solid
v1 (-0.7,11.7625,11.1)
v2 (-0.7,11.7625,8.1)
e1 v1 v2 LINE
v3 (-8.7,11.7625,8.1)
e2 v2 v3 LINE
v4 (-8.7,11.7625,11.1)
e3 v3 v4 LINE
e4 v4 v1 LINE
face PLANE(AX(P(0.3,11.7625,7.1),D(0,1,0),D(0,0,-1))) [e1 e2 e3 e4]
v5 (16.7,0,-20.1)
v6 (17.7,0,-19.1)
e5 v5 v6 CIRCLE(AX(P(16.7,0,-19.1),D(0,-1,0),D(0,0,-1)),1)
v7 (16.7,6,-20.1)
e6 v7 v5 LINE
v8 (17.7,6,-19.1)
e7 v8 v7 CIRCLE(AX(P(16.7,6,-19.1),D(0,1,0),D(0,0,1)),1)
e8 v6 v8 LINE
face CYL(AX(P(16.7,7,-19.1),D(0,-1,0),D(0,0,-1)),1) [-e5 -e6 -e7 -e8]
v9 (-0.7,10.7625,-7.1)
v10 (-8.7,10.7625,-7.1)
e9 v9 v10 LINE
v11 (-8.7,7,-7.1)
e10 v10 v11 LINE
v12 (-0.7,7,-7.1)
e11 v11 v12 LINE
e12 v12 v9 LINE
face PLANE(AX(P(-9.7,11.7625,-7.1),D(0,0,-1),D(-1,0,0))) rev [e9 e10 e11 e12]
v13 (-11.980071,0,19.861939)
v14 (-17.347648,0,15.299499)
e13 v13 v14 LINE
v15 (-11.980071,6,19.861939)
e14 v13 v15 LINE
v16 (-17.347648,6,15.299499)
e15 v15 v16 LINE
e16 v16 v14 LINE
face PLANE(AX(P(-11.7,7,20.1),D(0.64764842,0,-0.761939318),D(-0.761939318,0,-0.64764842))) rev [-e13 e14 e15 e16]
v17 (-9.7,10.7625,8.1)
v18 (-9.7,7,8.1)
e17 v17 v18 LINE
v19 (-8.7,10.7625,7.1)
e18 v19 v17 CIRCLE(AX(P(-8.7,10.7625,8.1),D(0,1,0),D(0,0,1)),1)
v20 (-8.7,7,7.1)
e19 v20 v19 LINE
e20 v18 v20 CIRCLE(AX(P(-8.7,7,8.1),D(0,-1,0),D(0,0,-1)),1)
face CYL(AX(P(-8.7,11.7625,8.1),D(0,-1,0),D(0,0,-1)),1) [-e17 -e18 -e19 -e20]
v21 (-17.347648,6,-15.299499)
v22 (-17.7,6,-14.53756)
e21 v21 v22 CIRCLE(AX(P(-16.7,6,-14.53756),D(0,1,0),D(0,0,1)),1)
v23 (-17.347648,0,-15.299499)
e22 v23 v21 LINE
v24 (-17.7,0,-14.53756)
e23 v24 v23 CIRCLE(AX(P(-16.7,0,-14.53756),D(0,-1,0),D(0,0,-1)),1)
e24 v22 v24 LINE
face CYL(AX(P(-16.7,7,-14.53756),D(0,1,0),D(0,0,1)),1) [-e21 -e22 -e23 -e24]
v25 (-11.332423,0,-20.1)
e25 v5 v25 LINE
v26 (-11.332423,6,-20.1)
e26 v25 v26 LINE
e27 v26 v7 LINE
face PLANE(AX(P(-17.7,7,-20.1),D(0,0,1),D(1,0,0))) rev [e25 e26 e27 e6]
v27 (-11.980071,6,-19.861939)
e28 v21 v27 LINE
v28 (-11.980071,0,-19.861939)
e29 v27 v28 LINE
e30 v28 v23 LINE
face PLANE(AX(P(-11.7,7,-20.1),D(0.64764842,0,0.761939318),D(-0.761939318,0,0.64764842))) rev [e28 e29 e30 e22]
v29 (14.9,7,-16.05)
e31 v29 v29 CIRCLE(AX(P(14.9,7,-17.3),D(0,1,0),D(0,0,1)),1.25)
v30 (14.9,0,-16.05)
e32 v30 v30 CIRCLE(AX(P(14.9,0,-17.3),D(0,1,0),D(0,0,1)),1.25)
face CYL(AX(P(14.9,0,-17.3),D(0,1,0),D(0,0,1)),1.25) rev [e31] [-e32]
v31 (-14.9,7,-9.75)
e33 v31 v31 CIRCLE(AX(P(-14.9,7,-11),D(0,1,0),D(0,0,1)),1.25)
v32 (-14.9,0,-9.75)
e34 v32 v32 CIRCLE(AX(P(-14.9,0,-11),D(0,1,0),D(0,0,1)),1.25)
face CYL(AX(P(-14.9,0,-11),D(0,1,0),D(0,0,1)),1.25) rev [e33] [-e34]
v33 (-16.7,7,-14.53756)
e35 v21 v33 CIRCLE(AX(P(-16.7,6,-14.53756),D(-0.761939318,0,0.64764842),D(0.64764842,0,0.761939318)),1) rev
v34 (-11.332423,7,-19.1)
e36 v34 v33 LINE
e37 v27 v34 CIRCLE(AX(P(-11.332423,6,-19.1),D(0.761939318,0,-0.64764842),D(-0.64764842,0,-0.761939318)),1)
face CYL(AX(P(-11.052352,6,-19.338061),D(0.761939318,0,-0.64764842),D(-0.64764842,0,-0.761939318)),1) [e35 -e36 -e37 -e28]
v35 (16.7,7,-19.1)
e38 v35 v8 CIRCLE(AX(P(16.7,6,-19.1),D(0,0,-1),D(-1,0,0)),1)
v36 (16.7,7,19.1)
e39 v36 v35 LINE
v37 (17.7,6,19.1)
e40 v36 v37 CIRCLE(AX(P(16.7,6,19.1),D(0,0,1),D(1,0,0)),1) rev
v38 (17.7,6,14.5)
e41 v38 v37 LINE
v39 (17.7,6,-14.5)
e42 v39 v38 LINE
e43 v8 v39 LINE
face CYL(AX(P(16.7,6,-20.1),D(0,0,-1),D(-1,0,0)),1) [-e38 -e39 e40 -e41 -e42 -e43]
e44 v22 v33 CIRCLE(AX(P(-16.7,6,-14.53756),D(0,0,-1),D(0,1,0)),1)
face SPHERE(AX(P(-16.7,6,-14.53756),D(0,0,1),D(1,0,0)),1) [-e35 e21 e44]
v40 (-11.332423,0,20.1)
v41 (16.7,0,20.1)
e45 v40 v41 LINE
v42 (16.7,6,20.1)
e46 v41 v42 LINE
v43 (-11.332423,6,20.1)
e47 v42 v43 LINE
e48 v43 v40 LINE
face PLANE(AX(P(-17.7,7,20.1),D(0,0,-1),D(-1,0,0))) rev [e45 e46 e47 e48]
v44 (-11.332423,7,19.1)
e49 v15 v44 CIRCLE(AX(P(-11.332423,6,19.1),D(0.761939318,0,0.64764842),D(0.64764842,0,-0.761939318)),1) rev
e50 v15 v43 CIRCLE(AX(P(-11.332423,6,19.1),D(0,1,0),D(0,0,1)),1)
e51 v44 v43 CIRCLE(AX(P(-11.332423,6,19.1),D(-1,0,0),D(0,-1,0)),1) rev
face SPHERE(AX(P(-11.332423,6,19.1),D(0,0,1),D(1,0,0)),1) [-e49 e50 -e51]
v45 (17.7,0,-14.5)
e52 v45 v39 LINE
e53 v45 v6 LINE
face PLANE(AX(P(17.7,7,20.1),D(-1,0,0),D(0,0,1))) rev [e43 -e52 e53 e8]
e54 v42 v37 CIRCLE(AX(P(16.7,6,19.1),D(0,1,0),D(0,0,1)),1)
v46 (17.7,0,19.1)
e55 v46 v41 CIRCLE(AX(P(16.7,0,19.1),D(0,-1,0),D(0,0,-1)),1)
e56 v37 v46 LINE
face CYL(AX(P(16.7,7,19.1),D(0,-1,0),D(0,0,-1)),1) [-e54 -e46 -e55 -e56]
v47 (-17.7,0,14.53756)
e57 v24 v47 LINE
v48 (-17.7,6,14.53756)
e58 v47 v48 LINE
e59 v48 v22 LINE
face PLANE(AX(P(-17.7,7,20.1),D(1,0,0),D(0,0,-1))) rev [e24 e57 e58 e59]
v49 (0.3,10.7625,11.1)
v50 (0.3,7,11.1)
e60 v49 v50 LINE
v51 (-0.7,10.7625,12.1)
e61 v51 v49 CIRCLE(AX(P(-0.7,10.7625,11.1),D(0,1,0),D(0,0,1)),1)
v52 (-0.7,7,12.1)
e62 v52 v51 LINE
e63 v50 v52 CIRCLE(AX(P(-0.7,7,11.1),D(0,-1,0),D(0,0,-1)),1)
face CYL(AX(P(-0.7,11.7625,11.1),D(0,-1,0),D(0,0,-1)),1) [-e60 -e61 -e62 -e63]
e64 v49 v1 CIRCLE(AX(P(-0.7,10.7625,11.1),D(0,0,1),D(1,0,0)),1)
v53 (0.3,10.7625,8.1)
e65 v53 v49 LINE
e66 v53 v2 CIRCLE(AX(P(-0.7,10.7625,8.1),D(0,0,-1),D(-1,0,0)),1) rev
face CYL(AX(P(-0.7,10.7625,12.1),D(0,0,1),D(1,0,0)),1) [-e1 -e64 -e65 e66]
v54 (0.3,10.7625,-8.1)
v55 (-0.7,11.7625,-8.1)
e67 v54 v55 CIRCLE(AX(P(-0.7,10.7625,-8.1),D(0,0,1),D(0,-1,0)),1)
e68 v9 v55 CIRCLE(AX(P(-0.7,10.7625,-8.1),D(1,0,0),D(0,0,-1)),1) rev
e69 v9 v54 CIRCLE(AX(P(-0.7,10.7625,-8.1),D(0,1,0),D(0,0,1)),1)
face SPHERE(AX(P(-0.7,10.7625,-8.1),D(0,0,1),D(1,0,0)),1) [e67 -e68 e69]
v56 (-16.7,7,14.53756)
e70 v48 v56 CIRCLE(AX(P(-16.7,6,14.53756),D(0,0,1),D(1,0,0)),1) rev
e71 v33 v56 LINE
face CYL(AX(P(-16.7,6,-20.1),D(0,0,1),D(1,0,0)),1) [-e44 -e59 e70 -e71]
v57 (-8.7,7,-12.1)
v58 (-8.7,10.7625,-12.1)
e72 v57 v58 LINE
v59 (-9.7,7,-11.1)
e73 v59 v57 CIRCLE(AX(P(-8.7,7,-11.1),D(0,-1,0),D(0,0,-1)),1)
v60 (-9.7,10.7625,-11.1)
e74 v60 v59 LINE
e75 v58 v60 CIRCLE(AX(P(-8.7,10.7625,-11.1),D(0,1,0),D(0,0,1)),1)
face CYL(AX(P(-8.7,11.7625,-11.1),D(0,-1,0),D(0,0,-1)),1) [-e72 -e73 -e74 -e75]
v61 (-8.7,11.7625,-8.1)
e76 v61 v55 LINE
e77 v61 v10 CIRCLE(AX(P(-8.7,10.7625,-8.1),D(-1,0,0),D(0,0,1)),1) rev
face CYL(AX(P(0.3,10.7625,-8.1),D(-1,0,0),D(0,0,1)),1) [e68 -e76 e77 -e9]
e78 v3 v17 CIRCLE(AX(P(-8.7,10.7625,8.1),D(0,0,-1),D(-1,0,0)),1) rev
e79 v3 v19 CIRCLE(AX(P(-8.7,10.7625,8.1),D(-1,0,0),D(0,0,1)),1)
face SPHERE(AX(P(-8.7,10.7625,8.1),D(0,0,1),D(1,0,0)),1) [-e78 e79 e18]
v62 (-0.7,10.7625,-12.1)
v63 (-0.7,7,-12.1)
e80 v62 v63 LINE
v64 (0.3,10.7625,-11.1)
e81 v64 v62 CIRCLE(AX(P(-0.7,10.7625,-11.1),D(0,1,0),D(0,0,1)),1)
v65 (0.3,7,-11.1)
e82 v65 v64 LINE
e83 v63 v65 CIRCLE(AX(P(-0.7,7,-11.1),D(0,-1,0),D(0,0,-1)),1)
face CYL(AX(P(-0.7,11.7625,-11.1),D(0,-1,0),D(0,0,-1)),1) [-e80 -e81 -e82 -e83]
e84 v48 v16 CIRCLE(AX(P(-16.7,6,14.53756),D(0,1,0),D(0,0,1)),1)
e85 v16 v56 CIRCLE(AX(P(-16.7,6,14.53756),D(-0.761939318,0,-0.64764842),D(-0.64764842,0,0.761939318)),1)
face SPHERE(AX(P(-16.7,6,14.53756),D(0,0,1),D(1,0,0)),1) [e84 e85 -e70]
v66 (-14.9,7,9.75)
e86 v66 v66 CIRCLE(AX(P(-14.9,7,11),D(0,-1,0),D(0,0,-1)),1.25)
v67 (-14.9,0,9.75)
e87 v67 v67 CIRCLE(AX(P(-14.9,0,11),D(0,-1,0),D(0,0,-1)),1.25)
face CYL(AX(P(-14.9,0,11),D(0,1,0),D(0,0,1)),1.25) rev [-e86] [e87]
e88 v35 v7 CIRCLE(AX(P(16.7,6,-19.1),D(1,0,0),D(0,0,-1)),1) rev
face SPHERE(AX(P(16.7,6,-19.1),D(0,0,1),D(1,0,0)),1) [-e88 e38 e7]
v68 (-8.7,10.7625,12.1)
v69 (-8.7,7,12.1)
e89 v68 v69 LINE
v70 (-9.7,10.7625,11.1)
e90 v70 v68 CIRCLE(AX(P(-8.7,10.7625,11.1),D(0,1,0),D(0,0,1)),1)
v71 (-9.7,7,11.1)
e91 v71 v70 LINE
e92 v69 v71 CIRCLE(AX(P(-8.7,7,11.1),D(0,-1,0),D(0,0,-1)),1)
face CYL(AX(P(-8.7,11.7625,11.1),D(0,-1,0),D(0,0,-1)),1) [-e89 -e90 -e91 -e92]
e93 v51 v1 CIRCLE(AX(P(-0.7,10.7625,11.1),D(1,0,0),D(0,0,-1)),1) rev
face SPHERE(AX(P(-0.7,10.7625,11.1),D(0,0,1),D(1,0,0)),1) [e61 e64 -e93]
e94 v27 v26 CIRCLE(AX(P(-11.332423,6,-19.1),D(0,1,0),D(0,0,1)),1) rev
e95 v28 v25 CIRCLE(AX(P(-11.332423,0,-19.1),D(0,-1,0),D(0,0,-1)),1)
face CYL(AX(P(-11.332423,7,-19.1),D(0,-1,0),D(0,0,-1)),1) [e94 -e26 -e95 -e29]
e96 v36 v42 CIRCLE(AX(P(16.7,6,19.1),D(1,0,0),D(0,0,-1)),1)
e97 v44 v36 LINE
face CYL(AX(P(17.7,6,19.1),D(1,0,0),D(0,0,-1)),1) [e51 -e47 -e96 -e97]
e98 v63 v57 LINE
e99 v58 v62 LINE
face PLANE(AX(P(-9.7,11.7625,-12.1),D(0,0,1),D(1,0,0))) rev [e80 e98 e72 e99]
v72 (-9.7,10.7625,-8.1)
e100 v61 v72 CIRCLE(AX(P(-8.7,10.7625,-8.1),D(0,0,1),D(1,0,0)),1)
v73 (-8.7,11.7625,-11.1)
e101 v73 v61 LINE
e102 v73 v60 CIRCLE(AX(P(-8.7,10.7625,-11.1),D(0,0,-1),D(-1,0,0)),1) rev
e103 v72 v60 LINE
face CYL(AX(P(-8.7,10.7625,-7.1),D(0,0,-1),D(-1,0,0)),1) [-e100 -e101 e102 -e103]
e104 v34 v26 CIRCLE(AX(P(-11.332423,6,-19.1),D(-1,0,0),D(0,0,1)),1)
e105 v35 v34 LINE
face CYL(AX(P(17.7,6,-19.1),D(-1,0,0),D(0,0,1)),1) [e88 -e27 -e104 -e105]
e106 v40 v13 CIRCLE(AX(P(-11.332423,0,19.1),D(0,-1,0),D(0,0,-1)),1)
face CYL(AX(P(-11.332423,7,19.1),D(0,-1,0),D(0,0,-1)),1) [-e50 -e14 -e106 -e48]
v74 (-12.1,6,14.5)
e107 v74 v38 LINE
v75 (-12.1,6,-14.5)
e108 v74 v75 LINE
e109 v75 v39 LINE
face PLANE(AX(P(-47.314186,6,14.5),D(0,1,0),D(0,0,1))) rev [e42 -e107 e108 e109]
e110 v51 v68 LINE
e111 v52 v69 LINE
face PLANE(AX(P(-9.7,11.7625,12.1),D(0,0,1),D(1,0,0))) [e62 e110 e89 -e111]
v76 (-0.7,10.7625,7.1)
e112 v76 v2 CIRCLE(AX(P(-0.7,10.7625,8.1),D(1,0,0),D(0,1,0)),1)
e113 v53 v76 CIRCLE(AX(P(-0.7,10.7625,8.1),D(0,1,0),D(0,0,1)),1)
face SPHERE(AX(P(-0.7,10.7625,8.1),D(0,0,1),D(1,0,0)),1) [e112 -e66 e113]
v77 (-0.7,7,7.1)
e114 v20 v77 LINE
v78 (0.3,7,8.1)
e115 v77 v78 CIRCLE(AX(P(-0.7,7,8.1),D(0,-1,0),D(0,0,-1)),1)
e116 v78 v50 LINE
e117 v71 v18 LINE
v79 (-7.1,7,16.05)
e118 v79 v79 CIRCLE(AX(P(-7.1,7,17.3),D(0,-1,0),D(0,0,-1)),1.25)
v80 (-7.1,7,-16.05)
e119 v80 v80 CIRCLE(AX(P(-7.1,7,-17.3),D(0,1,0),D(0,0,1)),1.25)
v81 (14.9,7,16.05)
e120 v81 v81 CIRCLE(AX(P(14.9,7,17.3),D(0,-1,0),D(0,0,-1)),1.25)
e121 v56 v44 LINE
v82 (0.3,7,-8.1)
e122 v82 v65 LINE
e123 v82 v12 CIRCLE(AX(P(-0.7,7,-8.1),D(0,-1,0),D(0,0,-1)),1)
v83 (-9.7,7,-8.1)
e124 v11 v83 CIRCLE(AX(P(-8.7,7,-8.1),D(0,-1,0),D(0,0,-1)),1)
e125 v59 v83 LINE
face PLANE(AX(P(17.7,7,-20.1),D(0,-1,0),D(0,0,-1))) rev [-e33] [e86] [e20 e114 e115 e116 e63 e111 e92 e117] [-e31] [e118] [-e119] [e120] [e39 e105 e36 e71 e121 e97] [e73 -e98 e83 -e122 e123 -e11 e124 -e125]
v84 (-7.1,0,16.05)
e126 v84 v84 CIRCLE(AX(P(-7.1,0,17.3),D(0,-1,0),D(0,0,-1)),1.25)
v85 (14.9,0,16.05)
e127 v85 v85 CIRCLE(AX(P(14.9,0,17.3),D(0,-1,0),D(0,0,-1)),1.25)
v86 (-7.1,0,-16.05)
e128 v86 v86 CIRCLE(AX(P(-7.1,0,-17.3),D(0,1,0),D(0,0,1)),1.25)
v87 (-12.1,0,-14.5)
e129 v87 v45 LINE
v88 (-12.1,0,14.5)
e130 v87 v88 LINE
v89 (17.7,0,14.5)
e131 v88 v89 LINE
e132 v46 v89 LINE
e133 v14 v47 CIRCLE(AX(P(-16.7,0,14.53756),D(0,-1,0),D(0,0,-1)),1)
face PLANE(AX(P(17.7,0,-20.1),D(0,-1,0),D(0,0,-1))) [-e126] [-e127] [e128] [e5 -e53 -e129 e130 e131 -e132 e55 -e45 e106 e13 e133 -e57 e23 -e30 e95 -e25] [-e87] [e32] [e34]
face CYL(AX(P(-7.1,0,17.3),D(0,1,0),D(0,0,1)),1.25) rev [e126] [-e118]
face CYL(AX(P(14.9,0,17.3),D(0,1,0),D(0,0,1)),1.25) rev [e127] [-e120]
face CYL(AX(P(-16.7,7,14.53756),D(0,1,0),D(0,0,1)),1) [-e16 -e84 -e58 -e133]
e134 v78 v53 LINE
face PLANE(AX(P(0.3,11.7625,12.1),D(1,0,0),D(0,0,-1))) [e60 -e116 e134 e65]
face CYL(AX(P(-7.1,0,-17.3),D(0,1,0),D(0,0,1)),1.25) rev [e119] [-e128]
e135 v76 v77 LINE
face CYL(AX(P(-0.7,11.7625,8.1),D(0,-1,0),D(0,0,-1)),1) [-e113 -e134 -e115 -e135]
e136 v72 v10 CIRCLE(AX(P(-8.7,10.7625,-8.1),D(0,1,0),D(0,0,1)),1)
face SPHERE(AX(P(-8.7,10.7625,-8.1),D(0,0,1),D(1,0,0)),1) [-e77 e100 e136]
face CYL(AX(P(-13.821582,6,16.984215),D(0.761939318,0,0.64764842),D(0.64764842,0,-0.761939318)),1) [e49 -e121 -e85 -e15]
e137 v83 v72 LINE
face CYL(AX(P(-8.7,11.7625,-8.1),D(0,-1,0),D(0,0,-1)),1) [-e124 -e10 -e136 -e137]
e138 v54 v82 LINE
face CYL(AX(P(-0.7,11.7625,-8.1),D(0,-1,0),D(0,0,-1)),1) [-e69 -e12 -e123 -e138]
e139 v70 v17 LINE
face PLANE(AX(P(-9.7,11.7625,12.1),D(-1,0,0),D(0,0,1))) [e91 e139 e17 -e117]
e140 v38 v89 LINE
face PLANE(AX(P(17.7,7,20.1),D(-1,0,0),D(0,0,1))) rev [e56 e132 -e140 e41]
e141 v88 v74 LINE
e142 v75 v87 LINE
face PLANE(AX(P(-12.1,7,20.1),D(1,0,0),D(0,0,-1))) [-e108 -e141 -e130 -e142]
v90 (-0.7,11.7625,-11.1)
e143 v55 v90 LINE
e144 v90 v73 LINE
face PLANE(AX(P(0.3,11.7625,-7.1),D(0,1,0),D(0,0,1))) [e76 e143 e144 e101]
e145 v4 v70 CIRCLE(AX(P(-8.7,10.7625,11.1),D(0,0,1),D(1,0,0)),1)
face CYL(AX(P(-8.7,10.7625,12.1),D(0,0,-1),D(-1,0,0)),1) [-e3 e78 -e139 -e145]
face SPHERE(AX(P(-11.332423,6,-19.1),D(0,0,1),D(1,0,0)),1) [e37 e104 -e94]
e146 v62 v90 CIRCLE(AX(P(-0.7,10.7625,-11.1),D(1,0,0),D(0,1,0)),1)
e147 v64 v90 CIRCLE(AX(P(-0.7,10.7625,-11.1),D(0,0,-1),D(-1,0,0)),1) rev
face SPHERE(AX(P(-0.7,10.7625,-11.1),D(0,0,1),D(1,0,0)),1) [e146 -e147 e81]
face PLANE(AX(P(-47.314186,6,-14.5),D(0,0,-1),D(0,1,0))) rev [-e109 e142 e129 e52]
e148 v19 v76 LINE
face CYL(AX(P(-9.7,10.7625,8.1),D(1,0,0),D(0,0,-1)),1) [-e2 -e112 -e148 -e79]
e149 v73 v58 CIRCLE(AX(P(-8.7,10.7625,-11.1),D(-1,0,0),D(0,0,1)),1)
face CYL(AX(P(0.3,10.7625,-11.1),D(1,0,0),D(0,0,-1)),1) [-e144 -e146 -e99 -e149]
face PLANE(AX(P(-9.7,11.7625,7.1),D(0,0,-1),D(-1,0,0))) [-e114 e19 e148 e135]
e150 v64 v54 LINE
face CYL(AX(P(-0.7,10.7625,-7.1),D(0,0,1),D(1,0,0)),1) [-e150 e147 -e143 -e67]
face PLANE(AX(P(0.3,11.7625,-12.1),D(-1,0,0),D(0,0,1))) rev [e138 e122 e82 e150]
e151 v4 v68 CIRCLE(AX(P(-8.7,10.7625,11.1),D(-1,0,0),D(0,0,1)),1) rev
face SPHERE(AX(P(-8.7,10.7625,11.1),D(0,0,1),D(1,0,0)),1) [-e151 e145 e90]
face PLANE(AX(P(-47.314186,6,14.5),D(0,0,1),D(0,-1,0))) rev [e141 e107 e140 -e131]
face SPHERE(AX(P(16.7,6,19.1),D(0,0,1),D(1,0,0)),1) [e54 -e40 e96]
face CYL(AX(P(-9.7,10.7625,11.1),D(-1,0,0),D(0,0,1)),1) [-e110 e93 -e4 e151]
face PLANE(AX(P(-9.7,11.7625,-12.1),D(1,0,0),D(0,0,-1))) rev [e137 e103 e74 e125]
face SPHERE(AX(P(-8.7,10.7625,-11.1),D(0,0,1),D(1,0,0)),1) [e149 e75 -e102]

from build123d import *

# Parameters (mm, degrees)
SKETCH1_W           = 35.4
SKETCH1_H           = 40.2
BOSS_EXTRUDE1_DEPTH = 7
SKETCH2_W           = 29
SKETCH2_H           = 6
CUT_EXTRUDE1_DEPTH  = 29.8
SKETCH3_R           = 1.25
CUT_EXTRUDE2_DEPTH  = 28.682124196
SKETCH4_W           = 10
SKETCH4_H           = 5
BOSS_EXTRUDE2_DEPTH = 4.7625
CHAMFER1_SIZE       = 5.1
CHAMFER1_SIZE2      = 6
MIRROR4_START       = -26.778357323
MIRROR4_OUTLINE_W   = 11
MIRROR4_OUTLINE_H   = 9
MIRROR4_DEPTH       = 3.885890521
FILLET1_R           = 1


# Read off the part's stored shape, not the designer's step: Mirror4
with BuildPart() as part:
    # Sketch1 → Boss-Extrude1 (new body)
    with BuildSketch(Plane(origin=(0, 0, 0), x_dir=(1, 0, 0), z_dir=(0, 1, 0))):
        Rectangle(SKETCH1_W, SKETCH1_H)
    extrude(amount=BOSS_EXTRUDE1_DEPTH)

    # Sketch2 → Cut-Extrude1 (cut)
    with BuildSketch(Plane(origin=(17.7, 0, 0), x_dir=(0, 0, -1), z_dir=(1, 0, 0))):
        with Locations((0, 3)):
            Rectangle(SKETCH2_W, SKETCH2_H)
    extrude(amount=-CUT_EXTRUDE1_DEPTH, mode=Mode.SUBTRACT)

    # Sketch3 → Cut-Extrude2 (cut, through all)
    with BuildSketch(Plane(origin=(0, 7, 0), x_dir=(1, 0, 0), z_dir=(0, 1, 0))):
        with Locations(Location((14.9, 17.3, 0), (0, 0, 270))):
            Circle(SKETCH3_R)
        with Locations(Location((-7.1, 17.3, 0), (0, 0, 270))):
            Circle(SKETCH3_R)
        with Locations(Location((-14.9, 11, 0), (0, 0, 270))):
            Circle(SKETCH3_R)
    cut_extrude2 = extrude(amount=-CUT_EXTRUDE2_DEPTH, mode=Mode.SUBTRACT)

    # Sketch4 → Boss-Extrude2 (add)
    with BuildSketch(Plane(origin=(0, 7, 0), x_dir=(-1, 0, 0), z_dir=(0, 1, 0))):
        with Locations((4.7, -9.6)):
            Rectangle(SKETCH4_W, SKETCH4_H)
    boss_extrude2 = extrude(amount=BOSS_EXTRUDE2_DEPTH)

    # Mirror1: Cut-Extrude2, Boss-Extrude2 across plane
    add(cut_extrude2.mirror(Plane.XY), mode=Mode.SUBTRACT)
    add(boss_extrude2.mirror(Plane.XY))

    # Chamfer1
    chamfer1_edges = [part.edges().sort_by_distance(p)[0] for p in [
        (-17.7, 3.5, 20.1),
    ]]
    chamfer1_side = [part.faces().sort_by_distance(p)[0] for p in [
        (-17.7, 3.5, 0),
    ]]
    chamfer(chamfer1_edges, length=CHAMFER1_SIZE, length2=CHAMFER1_SIZE2, reference=chamfer1_side[0])

    # Mirror4 outline → Mirror4 (cut)
    with BuildSketch(Plane(origin=(0, 0, 0), x_dir=(0.7619393177594598, 0, -0.6476484200955399), z_dir=(0.6476484200955399, 0, 0.7619393177594598)).offset(MIRROR4_START)):
        with Locations((0.5, 3.5)):
            Rectangle(MIRROR4_OUTLINE_W, MIRROR4_OUTLINE_H)
    extrude(amount=MIRROR4_DEPTH, mode=Mode.SUBTRACT)

    # Fillet1
    fillet1_edges = [part.edges().sort_by_distance(p)[0] for p in [
        (17.7, 7, 0),
        (0.3, 9.38125, -7.1),
        (0.3, 9.38125, -12.1),
        (-9.7, 9.38125, -12.1),
        (-9.7, 9.38125, -7.1),
        (0.3, 11.7625, -9.6),
        (-4.7, 11.7625, -12.1),
        (-9.7, 11.7625, -9.6),
        (-4.7, 11.7625, -7.1),
        (0.3, 11.7625, 9.6),
        (0.3, 9.38125, 12.1),
        (-4.7, 11.7625, 7.1),
        (0.3, 9.38125, 7.1),
        (-9.7, 11.7625, 9.6),
        (-9.7, 9.38125, 7.1),
        (-4.7, 11.7625, 12.1),
        (-9.7, 9.38125, 12.1),
        (3, 7, -20.1),
        (17.7, 3.5, 20.1),
        (17.7, 3.5, -20.1),
        (3, 7, 20.1),
        (-11.7, 3.5, 20.1),
        (-17.7, 3.5, 15),
        (-14.7, 7, 17.55),
        (-17.7, 7, 0),
        (-11.7, 3.5, -20.1),
        (-17.7, 3.5, -15),
        (-14.7, 7, -17.55),
    ]]
    fillet(fillet1_edges, radius=FILLET1_R - 0.0001)  # a hair under: the kernel refuses the full size


solid = part.part
